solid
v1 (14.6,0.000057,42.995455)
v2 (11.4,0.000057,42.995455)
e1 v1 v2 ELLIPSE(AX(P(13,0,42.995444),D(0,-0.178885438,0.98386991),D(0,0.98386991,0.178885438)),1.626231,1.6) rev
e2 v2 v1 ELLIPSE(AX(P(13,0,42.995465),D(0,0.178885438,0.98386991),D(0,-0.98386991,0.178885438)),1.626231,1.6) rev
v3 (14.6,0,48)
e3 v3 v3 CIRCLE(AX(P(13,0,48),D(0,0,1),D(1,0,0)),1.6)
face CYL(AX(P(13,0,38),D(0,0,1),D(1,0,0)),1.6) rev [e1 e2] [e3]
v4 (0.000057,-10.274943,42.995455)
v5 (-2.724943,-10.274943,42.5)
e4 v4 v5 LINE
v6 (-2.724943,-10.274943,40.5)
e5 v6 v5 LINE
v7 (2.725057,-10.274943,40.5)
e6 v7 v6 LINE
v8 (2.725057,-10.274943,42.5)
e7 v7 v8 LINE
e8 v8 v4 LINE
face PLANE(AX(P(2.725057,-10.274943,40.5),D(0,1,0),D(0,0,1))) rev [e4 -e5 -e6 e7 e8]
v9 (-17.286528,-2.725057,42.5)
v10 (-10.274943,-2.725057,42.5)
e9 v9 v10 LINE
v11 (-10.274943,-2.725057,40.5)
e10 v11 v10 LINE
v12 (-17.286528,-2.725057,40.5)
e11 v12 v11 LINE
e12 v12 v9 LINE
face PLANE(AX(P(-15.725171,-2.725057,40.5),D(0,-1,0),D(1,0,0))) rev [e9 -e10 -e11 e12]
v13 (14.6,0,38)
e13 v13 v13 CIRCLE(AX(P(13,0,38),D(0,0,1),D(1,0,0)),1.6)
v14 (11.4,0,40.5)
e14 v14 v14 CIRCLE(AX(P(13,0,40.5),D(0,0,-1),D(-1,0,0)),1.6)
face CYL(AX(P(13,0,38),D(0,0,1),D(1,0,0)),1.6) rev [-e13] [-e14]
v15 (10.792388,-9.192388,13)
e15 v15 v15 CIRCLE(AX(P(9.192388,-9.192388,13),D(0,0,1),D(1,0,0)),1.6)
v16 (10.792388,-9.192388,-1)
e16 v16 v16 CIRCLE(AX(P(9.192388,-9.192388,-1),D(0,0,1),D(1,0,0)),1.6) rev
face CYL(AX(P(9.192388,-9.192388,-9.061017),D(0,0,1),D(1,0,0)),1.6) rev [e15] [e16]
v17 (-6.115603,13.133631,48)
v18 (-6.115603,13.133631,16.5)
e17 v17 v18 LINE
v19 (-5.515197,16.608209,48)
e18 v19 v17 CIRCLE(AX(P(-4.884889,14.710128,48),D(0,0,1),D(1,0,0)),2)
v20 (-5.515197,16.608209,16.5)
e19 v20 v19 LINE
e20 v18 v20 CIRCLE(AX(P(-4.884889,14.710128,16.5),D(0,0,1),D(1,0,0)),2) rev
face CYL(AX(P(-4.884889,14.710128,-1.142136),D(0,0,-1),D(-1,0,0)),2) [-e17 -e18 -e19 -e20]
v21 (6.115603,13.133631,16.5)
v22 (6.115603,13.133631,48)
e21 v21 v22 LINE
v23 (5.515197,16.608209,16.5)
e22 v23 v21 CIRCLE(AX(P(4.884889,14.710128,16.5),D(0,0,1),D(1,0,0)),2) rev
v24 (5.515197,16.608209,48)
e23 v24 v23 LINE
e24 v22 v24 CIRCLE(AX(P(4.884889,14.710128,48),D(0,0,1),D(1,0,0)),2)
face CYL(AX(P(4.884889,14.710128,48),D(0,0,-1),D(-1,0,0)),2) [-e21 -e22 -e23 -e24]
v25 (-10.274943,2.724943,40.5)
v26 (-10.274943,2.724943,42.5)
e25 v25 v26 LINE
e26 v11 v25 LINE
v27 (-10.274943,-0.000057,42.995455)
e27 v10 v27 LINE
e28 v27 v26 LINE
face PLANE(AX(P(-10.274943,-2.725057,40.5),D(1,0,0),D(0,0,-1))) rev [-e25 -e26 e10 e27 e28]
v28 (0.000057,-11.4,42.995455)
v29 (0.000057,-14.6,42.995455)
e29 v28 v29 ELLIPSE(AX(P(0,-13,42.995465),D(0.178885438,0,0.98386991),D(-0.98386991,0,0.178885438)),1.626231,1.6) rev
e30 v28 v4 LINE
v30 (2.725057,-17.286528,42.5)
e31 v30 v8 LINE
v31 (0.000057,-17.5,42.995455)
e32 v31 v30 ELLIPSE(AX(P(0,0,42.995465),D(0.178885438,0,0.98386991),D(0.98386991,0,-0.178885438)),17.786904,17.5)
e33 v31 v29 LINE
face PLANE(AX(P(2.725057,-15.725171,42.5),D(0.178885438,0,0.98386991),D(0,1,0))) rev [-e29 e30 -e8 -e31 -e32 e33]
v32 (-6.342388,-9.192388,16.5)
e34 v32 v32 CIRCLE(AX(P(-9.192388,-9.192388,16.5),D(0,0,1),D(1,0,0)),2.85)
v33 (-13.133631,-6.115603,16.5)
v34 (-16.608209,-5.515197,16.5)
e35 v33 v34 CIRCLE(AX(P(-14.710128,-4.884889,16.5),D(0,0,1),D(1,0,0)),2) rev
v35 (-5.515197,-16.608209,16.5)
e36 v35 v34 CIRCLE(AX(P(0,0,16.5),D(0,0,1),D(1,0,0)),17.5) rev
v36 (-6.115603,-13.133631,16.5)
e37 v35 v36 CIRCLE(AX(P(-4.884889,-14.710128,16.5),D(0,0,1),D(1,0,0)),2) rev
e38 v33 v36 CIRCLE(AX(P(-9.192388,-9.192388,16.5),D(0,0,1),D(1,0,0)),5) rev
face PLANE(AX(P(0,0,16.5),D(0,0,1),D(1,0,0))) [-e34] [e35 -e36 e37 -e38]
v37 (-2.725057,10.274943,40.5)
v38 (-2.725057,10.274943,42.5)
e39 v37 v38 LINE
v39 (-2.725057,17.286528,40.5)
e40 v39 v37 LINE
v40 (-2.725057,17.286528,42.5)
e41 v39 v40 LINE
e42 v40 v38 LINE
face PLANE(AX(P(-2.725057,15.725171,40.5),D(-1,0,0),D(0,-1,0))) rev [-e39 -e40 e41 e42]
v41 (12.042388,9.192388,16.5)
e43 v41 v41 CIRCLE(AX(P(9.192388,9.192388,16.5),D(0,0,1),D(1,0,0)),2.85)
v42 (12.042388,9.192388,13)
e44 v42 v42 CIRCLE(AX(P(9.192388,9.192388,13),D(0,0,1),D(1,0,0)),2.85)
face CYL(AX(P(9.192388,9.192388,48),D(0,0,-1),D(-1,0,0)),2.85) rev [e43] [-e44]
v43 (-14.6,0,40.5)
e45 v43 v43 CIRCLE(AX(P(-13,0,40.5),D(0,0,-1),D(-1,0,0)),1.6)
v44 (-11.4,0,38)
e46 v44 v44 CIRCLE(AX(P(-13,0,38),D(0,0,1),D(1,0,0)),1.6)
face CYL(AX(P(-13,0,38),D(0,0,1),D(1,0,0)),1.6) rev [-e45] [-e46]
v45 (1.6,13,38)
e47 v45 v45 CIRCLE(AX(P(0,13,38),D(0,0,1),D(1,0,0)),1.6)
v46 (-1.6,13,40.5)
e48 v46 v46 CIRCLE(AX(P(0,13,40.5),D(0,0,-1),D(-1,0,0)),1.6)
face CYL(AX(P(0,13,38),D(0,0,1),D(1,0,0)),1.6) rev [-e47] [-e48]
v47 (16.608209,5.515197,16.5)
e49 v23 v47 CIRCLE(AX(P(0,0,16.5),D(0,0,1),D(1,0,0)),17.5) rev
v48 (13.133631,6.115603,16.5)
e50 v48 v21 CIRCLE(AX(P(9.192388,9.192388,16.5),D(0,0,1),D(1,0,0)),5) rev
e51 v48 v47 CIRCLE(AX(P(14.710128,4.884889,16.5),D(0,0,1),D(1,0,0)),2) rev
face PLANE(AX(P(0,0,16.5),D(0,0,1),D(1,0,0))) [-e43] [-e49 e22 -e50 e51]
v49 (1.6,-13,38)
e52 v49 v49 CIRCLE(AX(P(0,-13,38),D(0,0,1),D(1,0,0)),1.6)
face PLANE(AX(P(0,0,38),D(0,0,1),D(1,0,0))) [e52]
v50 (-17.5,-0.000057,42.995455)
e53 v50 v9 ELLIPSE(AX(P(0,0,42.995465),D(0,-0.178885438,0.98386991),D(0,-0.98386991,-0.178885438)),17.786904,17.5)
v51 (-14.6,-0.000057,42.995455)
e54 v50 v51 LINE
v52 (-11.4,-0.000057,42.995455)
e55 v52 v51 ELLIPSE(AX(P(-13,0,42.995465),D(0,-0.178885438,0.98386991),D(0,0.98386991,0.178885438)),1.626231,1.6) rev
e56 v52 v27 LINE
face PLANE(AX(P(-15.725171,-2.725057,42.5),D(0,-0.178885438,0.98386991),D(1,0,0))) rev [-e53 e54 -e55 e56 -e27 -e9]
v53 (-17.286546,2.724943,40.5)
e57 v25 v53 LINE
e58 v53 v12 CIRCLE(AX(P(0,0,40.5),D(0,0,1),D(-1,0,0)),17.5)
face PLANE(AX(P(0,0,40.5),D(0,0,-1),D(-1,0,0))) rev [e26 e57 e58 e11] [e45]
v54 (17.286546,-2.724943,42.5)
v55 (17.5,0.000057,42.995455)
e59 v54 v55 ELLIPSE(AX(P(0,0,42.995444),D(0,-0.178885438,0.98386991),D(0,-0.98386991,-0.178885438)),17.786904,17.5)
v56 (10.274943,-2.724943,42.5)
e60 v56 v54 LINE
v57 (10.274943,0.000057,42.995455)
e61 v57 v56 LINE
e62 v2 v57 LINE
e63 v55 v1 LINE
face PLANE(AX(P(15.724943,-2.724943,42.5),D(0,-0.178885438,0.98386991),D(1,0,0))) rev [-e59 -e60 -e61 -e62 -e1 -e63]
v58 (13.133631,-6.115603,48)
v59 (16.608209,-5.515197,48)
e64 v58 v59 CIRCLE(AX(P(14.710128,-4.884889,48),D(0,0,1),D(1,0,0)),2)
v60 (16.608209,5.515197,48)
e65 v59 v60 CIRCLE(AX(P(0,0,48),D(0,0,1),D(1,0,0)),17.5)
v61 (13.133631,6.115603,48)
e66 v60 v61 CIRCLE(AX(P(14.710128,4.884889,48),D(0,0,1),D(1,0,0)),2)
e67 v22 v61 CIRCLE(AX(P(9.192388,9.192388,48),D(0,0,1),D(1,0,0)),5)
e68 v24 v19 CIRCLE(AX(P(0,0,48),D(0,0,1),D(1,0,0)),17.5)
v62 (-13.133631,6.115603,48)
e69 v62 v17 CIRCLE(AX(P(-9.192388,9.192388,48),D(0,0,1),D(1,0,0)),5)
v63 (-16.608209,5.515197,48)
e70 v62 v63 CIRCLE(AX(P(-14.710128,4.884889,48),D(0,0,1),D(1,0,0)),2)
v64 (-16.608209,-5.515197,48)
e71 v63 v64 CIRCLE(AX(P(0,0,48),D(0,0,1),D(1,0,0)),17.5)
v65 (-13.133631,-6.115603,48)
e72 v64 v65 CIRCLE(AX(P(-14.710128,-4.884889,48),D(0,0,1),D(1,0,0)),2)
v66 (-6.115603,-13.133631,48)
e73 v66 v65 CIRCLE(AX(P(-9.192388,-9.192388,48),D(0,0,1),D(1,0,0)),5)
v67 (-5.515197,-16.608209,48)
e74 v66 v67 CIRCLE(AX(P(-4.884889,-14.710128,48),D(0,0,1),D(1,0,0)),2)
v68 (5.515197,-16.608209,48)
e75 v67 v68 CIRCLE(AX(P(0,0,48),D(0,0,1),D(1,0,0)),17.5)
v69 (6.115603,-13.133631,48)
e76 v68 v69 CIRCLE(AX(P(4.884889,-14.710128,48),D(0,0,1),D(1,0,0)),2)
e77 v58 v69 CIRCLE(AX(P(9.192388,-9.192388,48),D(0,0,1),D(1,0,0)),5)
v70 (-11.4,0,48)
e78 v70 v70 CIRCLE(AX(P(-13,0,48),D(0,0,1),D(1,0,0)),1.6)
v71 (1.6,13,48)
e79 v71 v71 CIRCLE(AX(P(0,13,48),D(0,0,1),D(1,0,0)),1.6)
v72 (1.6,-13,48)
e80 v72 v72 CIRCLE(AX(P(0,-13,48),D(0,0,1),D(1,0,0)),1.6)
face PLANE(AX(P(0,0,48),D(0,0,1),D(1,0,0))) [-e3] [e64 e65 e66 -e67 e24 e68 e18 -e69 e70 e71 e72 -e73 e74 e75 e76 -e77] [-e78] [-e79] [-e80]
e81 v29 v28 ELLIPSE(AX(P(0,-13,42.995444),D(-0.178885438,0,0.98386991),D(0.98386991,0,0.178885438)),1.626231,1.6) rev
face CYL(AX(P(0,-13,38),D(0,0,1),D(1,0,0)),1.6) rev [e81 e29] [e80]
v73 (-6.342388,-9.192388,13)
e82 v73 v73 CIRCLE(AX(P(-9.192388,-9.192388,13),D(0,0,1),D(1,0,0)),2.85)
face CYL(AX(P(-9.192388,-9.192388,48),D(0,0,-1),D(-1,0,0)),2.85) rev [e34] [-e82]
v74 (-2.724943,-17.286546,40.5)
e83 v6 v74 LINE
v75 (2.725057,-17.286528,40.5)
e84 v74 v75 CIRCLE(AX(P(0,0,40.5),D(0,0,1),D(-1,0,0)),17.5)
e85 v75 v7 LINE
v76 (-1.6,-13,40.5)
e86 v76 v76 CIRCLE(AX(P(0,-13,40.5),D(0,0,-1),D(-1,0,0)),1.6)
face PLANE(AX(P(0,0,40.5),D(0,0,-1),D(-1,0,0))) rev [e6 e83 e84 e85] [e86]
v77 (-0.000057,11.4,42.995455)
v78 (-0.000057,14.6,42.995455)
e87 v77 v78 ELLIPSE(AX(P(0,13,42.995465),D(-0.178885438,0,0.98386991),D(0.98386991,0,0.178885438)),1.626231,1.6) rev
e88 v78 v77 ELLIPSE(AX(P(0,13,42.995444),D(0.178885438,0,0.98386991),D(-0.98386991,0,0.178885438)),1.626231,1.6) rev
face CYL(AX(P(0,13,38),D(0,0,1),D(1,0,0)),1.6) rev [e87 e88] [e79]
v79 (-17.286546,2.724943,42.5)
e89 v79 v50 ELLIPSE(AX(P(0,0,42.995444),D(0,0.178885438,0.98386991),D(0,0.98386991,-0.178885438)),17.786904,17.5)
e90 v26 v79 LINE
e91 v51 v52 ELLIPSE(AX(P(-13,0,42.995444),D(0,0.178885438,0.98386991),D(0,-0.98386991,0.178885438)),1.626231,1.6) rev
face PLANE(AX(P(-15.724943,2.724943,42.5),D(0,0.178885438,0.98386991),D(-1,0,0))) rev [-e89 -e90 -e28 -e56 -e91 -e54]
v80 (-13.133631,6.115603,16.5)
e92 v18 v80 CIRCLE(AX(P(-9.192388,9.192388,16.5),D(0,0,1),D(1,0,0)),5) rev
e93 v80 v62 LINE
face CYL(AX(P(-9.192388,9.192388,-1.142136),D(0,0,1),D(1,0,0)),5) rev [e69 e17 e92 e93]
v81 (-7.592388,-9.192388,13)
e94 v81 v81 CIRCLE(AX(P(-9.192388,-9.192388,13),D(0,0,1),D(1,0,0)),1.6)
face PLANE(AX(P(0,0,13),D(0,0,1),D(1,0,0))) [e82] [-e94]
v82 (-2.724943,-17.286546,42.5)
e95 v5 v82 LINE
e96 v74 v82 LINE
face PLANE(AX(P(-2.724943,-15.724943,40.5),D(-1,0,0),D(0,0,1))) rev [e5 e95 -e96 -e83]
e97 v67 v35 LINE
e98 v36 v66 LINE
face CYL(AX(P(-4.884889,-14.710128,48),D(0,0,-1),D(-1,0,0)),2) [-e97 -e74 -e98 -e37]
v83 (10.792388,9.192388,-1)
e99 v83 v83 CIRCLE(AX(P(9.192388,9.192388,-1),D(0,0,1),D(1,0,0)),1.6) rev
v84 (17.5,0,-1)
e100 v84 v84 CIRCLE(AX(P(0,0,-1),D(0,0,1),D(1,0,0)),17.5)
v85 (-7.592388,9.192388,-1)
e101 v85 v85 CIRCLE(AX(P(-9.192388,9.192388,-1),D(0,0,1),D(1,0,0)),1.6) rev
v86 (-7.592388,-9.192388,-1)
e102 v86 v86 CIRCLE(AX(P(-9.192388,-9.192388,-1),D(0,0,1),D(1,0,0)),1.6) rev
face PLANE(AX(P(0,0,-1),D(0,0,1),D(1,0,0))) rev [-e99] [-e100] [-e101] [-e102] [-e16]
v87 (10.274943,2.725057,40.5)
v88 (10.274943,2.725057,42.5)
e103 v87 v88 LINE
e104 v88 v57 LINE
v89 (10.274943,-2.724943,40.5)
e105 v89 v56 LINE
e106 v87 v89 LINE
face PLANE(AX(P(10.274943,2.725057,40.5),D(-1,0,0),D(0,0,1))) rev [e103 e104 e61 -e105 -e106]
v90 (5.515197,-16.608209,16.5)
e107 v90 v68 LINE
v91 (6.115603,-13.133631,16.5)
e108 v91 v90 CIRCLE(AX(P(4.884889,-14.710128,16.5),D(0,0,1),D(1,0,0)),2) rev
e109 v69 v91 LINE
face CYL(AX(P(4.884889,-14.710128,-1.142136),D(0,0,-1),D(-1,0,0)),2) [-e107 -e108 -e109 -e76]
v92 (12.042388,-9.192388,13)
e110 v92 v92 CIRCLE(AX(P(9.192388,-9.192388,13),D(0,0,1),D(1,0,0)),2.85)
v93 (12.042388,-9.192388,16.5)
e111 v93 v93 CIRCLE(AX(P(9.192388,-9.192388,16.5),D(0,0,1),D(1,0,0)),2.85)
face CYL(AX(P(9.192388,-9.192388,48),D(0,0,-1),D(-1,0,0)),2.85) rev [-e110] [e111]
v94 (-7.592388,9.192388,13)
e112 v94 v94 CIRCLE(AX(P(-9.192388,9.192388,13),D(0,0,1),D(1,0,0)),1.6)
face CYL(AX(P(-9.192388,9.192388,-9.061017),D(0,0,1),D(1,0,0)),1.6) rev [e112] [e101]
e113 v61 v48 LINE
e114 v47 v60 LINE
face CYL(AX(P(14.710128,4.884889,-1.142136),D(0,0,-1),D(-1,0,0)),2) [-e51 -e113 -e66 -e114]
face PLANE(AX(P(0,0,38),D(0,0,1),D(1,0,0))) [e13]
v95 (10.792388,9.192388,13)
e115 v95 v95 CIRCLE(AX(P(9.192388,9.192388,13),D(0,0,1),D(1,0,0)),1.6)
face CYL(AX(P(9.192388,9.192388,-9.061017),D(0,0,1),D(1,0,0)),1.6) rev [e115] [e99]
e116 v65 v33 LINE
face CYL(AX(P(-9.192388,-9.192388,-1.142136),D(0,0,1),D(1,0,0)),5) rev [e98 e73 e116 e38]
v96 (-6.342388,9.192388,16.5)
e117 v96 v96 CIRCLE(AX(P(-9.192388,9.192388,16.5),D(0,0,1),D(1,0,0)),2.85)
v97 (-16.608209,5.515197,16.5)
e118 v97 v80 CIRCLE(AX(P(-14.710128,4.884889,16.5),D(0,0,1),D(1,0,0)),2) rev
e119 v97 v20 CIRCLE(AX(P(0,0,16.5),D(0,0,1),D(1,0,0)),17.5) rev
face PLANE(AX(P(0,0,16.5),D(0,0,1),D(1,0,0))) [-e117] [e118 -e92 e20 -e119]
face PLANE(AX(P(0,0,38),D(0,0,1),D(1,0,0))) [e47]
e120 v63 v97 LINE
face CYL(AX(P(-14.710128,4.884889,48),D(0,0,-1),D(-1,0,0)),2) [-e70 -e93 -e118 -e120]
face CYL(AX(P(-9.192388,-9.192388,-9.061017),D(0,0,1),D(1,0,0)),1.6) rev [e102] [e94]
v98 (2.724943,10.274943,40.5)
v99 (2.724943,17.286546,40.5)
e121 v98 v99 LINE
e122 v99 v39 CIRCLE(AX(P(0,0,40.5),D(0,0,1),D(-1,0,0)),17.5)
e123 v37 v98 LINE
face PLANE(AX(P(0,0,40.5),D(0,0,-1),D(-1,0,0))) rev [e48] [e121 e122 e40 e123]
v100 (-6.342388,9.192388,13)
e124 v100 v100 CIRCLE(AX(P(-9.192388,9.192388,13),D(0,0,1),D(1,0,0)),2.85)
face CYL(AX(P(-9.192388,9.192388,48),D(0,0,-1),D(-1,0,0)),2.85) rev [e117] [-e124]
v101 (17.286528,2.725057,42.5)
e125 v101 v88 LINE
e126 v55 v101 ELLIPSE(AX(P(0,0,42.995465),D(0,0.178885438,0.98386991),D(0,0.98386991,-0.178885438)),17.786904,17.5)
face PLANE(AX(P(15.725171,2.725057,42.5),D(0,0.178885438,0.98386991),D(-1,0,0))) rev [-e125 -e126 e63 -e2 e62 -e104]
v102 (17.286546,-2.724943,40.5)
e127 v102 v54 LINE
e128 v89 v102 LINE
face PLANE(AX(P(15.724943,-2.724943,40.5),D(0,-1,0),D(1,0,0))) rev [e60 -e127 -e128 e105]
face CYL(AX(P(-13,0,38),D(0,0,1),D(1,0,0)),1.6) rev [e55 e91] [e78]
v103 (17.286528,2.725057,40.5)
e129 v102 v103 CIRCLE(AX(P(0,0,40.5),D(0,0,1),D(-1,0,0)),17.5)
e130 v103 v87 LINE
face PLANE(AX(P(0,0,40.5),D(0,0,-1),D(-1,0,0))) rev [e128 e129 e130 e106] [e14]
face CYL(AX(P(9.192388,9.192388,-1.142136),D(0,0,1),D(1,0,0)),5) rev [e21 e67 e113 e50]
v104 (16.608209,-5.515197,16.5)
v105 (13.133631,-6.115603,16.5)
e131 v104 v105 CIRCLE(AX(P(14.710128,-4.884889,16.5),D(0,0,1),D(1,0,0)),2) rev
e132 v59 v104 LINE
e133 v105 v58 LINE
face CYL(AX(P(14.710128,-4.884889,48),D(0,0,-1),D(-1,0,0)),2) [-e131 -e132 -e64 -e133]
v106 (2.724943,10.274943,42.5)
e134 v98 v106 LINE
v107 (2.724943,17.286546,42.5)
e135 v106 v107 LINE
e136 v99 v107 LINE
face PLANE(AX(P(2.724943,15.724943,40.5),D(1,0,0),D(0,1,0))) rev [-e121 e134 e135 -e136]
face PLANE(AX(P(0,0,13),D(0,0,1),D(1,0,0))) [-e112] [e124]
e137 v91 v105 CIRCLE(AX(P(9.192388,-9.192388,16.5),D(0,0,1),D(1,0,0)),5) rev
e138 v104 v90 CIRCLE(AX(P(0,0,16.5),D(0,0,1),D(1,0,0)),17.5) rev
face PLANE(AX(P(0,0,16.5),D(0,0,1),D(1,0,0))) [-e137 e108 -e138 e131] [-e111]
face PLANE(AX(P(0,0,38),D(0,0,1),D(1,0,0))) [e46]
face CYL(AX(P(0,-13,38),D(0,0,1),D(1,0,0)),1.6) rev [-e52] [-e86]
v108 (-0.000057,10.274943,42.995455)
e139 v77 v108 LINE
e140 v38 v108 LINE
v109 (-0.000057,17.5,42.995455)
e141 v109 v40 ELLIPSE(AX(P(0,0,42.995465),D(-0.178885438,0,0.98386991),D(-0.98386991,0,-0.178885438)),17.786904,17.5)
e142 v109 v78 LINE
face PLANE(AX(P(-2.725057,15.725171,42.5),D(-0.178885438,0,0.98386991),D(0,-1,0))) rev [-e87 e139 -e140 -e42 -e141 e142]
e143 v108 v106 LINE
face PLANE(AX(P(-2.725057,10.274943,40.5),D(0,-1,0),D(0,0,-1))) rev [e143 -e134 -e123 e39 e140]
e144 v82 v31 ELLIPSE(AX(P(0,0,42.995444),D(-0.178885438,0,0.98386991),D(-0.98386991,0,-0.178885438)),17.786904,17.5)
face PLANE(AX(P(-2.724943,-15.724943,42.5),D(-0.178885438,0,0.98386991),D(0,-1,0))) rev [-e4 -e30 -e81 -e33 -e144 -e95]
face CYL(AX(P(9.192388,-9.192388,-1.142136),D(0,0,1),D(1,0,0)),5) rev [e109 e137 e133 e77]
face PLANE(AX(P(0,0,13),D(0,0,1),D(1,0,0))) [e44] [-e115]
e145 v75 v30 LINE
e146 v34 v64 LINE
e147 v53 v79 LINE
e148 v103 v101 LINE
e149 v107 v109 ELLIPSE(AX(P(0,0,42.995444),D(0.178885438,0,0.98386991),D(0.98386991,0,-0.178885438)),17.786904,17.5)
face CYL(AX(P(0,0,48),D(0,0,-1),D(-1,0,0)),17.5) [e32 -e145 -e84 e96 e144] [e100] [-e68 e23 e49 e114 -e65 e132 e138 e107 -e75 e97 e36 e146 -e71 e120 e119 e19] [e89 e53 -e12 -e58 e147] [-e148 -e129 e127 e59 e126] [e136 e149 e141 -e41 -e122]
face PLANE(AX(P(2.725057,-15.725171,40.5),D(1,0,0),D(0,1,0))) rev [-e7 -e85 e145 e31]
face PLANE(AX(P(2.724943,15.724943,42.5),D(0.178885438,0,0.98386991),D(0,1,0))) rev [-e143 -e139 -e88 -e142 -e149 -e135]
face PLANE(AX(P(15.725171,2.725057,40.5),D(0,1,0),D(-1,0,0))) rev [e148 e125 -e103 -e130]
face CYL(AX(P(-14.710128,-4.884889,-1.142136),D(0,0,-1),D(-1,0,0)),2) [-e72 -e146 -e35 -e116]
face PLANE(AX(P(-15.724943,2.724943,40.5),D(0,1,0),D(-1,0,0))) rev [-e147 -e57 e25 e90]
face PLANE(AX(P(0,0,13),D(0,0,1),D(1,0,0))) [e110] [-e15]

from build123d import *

# Parameters (mm, degrees)
SKETCH1_R                = 17.5
SKETCH1_R_2              = 2.85
BOSS_EXTRUDE1_DEPTH      = 48
BOSS_EXTRUDE3_START      = -1
SKETCH1_4_R              = 17.5
SKETCH1_4_R_2            = 2.85
BOSS_EXTRUDE3_DEPTH      = 1
BOSS_EXTRUDE2_DEPTH      = 13
BOSS_EXTRUDE2_DEPTH_BACK = 1
SKETCH1_3_R              = 2.85
SKETCH1_3_R_2            = 1.6
SKETCH2_R                = 5
CUT_EXTRUDE1_DEPTH       = 31.5
FILLET1_R                = 2
CUT_EXTRUDE2_START       = -7.5
SKETCH3_R                = 1.6
CUT_EXTRUDE2_DEPTH       = 2.5
CUT_EXTRUDE3_START       = -10
SKETCH3_2_R              = 1.6
CUT_EXTRUDE3_DEPTH       = 10
CHAMFER1_SIZE            = 2.75
CHAMFER1_SIZE_2          = 0.5


with BuildPart() as part:
    # Sketch1 → Boss-Extrude1 (new body)
    with BuildSketch(Plane(origin=(0, 0, 0), x_dir=(0, 1, 0), z_dir=(0, 0, 1))):
        with Locations(Location((0, 0, 0), (0, 0, 270))):
            Circle(SKETCH1_R)
        with Locations(Location((-9.192388155, 9.192388155, 0), (0, 0, 270))):
            Circle(SKETCH1_R_2, mode=Mode.SUBTRACT)
        with Locations(Location((-9.192388155, -9.192388155, 0), (0, 0, 270))):
            Circle(SKETCH1_R_2, mode=Mode.SUBTRACT)
        with Locations(Location((9.192388155, -9.192388155, 0), (0, 0, 270))):
            Circle(SKETCH1_R_2, mode=Mode.SUBTRACT)
        with Locations(Location((9.192388155, 9.192388155, 0), (0, 0, 270))):
            Circle(SKETCH1_R_2, mode=Mode.SUBTRACT)
    extrude(amount=BOSS_EXTRUDE1_DEPTH)

    # Sketch1<4> → Boss-Extrude3 (add)
    with BuildSketch(Plane(origin=(0, 0, 0), x_dir=(0, 1, 0), z_dir=(0, 0, 1)).offset(BOSS_EXTRUDE3_START)):
        with Locations(Location((0, 0, 0), (0, 0, 270))):
            Circle(SKETCH1_4_R)
        with Locations(Location((-9.192388155, 9.192388155, 0), (0, 0, 270))):
            Circle(SKETCH1_4_R_2, mode=Mode.SUBTRACT)
        with Locations(Location((-9.192388155, -9.192388155, 0), (0, 0, 270))):
            Circle(SKETCH1_4_R_2, mode=Mode.SUBTRACT)
        with Locations(Location((9.192388155, -9.192388155, 0), (0, 0, 270))):
            Circle(SKETCH1_4_R_2, mode=Mode.SUBTRACT)
        with Locations(Location((9.192388155, 9.192388155, 0), (0, 0, 270))):
            Circle(SKETCH1_4_R_2, mode=Mode.SUBTRACT)
    extrude(amount=BOSS_EXTRUDE3_DEPTH)

    # Sketch1<3> → Boss-Extrude2 (add, two sides: drawn at the far end of the back side and taken through both)
    # profile 1 of 4: a face of its own
    with BuildSketch(Plane(origin=(0, 0, 0), x_dir=(0, 1, 0), z_dir=(0, 0, 1)).offset(-BOSS_EXTRUDE2_DEPTH_BACK)):
        with Locations(Location((-9.192388155, -9.192388155, 0), (0, 0, 270))):
            Circle(SKETCH1_3_R)
        with Locations(Location((-9.192388155, -9.192388155, 0), (0, 0, 270))):
            Circle(SKETCH1_3_R_2, mode=Mode.SUBTRACT)
    # profile 2 of 4: a face of its own
    with BuildSketch(Plane(origin=(0, 0, 0), x_dir=(0, 1, 0), z_dir=(0, 0, 1)).offset(-BOSS_EXTRUDE2_DEPTH_BACK)):
        with Locations(Location((-9.192388155, 9.192388155, 0), (0, 0, 270))):
            Circle(SKETCH1_3_R)
        with Locations(Location((-9.192388155, 9.192388155, 0), (0, 0, 270))):
            Circle(SKETCH1_3_R_2, mode=Mode.SUBTRACT)
    # profile 3 of 4: a face of its own
    with BuildSketch(Plane(origin=(0, 0, 0), x_dir=(0, 1, 0), z_dir=(0, 0, 1)).offset(-BOSS_EXTRUDE2_DEPTH_BACK)):
        with Locations(Location((9.192388155, -9.192388155, 0), (0, 0, 270))):
            Circle(SKETCH1_3_R)
        with Locations(Location((9.192388155, -9.192388155, 0), (0, 0, 270))):
            Circle(SKETCH1_3_R_2, mode=Mode.SUBTRACT)
    # profile 4 of 4: a face of its own
    with BuildSketch(Plane(origin=(0, 0, 0), x_dir=(0, 1, 0), z_dir=(0, 0, 1)).offset(-BOSS_EXTRUDE2_DEPTH_BACK)):
        with Locations(Location((9.192388155, 9.192388155, 0), (0, 0, 270))):
            Circle(SKETCH1_3_R)
        with Locations(Location((9.192388155, 9.192388155, 0), (0, 0, 270))):
            Circle(SKETCH1_3_R_2, mode=Mode.SUBTRACT)
    extrude(amount=BOSS_EXTRUDE2_DEPTH + BOSS_EXTRUDE2_DEPTH_BACK)

    # Sketch2 → Cut-Extrude1 (cut)
    with BuildSketch(Plane.XY.offset(48)):
        with Locations((-9.192388155, 9.192388155)):
            Circle(SKETCH2_R)
        with Locations((9.192388155, 9.192388155)):
            Circle(SKETCH2_R)
        with Locations((9.192388155, -9.192388155)):
            Circle(SKETCH2_R)
        with Locations((-9.192388155, -9.192388155)):
            Circle(SKETCH2_R)
    extrude(amount=-CUT_EXTRUDE1_DEPTH, mode=Mode.SUBTRACT)

    # Fillet1
    fillet1_edges = [part.edges().sort_by_distance(p)[0] for p in [
        (14.028560913, -10.46181049, 32.25),
        (10.46181049, -14.028560913, 32.25),
        (10.46181049, 14.028560913, 32.25),
        (14.028560913, 10.46181049, 32.25),
        (-14.028560913, 10.46181049, 32.25),
        (-10.46181049, 14.028560913, 32.25),
        (-10.46181049, -14.028560913, 32.25),
        (-14.028560913, -10.46181049, 32.25),
    ]]
    fillet(fillet1_edges, radius=FILLET1_R)

    # Sketch3 → Cut-Extrude2 (cut)
    # profile 1 of 4: a face of its own
    with BuildSketch(Plane.XY.offset(48).offset(CUT_EXTRUDE2_START)):
        with BuildLine():
            Line((-2.725057077, 15.725171237), (-2.725057077, 17.286528394))
            ThreePointArc((-2.725057077, 17.286528394), (-5.7782e-05, 17.5), (2.724942923, 17.286546389))
            Line((2.724942923, 17.286546389), (2.724942923, 15.724942923))
            Line((2.724942923, 15.724942923), (2.724942923, 10.274942923))
            Line((2.724942923, 10.274942923), (-2.725057077, 10.274942923))
            Line((-2.725057077, 10.274942923), (-2.725057077, 15.725171237))
        make_face()
        with Locations((0, 13)):
            Circle(SKETCH3_R, mode=Mode.SUBTRACT)
    # profile 2 of 4: a face of its own
    with BuildSketch(Plane.XY.offset(48).offset(CUT_EXTRUDE2_START)):
        with BuildLine():
            Line((15.724942923, -2.724942923), (10.274942923, -2.724942923))
            Line((10.274942923, -2.724942923), (10.274942923, 2.725057077))
            Line((10.274942923, 2.725057077), (15.725171237, 2.725057077))
            Line((15.725171237, 2.725057077), (17.286528394, 2.725057077))
            ThreePointArc((17.286528394, 2.725057077), (17.5, 5.7782e-05), (17.286546389, -2.724942923))
            Line((17.286546389, -2.724942923), (15.724942923, -2.724942923))
        make_face()
        with Locations((13, 0)):
            Circle(SKETCH3_R, mode=Mode.SUBTRACT)
    # profile 3 of 4: a face of its own
    with BuildSketch(Plane.XY.offset(48).offset(CUT_EXTRUDE2_START)):
        with BuildLine():
            Line((-2.724942923, -15.724942923), (-2.724942923, -10.274942923))
            Line((-2.724942923, -10.274942923), (2.725057077, -10.274942923))
            Line((2.725057077, -10.274942923), (2.725057077, -15.725171237))
            Line((2.725057077, -15.725171237), (2.725057077, -17.286528394))
            ThreePointArc((2.725057077, -17.286528394), (5.7782e-05, -17.5), (-2.724942923, -17.286546389))
            Line((-2.724942923, -17.286546389), (-2.724942923, -15.724942923))
        make_face()
        with Locations((0, -13)):
            Circle(SKETCH3_R, mode=Mode.SUBTRACT)
    # profile 4 of 4: a face of its own
    with BuildSketch(Plane.XY.offset(48).offset(CUT_EXTRUDE2_START)):
        with BuildLine():
            Line((-15.724942923, 2.724942923), (-10.274942923, 2.724942923))
            Line((-10.274942923, 2.724942923), (-10.274942923, -2.725057077))
            Line((-10.274942923, -2.725057077), (-15.725171237, -2.725057077))
            Line((-15.725171237, -2.725057077), (-17.286528394, -2.725057077))
            ThreePointArc((-17.286528394, -2.725057077), (-17.5, -5.7782e-05), (-17.286546389, 2.724942923))
            Line((-17.286546389, 2.724942923), (-15.724942923, 2.724942923))
        make_face()
        with Locations((-13, 0)):
            Circle(SKETCH3_R, mode=Mode.SUBTRACT)
    extrude(amount=CUT_EXTRUDE2_DEPTH, mode=Mode.SUBTRACT)

    # Sketch3<2> → Cut-Extrude3 (cut)
    with BuildSketch(Plane.XY.offset(48).offset(CUT_EXTRUDE3_START)):
        with Locations((-13, 0)):
            Circle(SKETCH3_2_R)
        with Locations((0, 13)):
            Circle(SKETCH3_2_R)
        with Locations((13, 0)):
            Circle(SKETCH3_2_R)
        with Locations((0, -13)):
            Circle(SKETCH3_2_R)
    extrude(amount=CUT_EXTRUDE3_DEPTH, mode=Mode.SUBTRACT)

    # Chamfer1
    # the kernel refuses this chamfer: 2.75, 0.5 mm, written as the material it adds along each edge
    with BuildSketch(Plane(origin=(-3.129209364, -2.725057077, 43), x_dir=(0, 0.9999763028084744, 0.006884317068104265), z_dir=(-1, 0, 0))) as chamfer1_piece_1_section:
        Polygon((CHAMFER1_SIZE * 0.999976302808, CHAMFER1_SIZE * 0.0068843170681), (-CHAMFER1_SIZE_2 * 0.0068843170681, CHAMFER1_SIZE_2 * 0.999976302808), (0, 0), align=None)
    chamfer1_piece_1 = extrude(amount=21.30305259, mode=Mode.PRIVATE)
    chamfer1_piece_1 = chamfer1_piece_1 & Plane(origin=(0, 0, 42.863927103), x_dir=(1, 0, 0), z_dir=(0, 0, -1)) * Cylinder(17.5, 54, mode=Mode.PRIVATE)
    chamfer1_piece_1 = chamfer1_piece_1 - Plane(origin=(-13, 0, 42.863927103), x_dir=(1, 0, 0), z_dir=(0, 0, -1)) * Cylinder(1.6, 54, mode=Mode.PRIVATE)
    add(chamfer1_piece_1)
    with BuildSketch(Plane(origin=(-24.432279948, 2.724942923, 43), x_dir=(0, 0.20388124945923355, -0.9789956262001082), z_dir=(1, 0, 0))) as chamfer1_piece_2_section:
        Polygon((CHAMFER1_SIZE_2 * 0.9789956262, -CHAMFER1_SIZE_2 * 0.203881249459), (-CHAMFER1_SIZE * 0.203881249459, -CHAMFER1_SIZE * 0.9789956262), (0, 0), align=None)
    chamfer1_piece_2 = extrude(amount=21.303070585, mode=Mode.PRIVATE)
    chamfer1_piece_2 = chamfer1_piece_2 & Plane(origin=(0, 0, 42.851795499), x_dir=(1, 0, 0), z_dir=(0, 0, -1)) * Cylinder(17.5, 54, mode=Mode.PRIVATE)
    chamfer1_piece_2 = chamfer1_piece_2 - Plane(origin=(-13, 0, 42.851795499), x_dir=(1, 0, 0), z_dir=(0, 0, -1)) * Cylinder(1.6, 54, mode=Mode.PRIVATE)
    add(chamfer1_piece_2)
    with BuildSketch(Plane(origin=(-2.725057077, 3.129209364, 43), x_dir=(0.9999763028084744, 0, 0.006884317068104265), z_dir=(0, 1, 0))) as chamfer1_piece_3_section:
        Polygon((CHAMFER1_SIZE * 0.999976302808, CHAMFER1_SIZE * 0.0068843170681), (-CHAMFER1_SIZE_2 * 0.0068843170681, CHAMFER1_SIZE_2 * 0.999976302808), (0, 0), align=None)
    chamfer1_piece_3 = extrude(amount=21.30305259, mode=Mode.PRIVATE)
    chamfer1_piece_3 = chamfer1_piece_3 & Plane(origin=(0, 0, 42.863927103), x_dir=(1, 0, 0), z_dir=(0, 0, -1)) * Cylinder(17.5, 54, mode=Mode.PRIVATE)
    chamfer1_piece_3 = chamfer1_piece_3 - Plane(origin=(0, 13, 42.863927103), x_dir=(1, 0, 0), z_dir=(0, 0, -1)) * Cylinder(1.6, 54, mode=Mode.PRIVATE)
    add(chamfer1_piece_3)
    with BuildSketch(Plane(origin=(2.724942923, 24.432279948, 43), x_dir=(0.20388124945923355, 0, -0.9789956262001082), z_dir=(0, -1, 0))) as chamfer1_piece_4_section:
        Polygon((CHAMFER1_SIZE_2 * 0.9789956262, -CHAMFER1_SIZE_2 * 0.203881249459), (-CHAMFER1_SIZE * 0.203881249459, -CHAMFER1_SIZE * 0.9789956262), (0, 0), align=None)
    chamfer1_piece_4 = extrude(amount=21.303070585, mode=Mode.PRIVATE)
    chamfer1_piece_4 = chamfer1_piece_4 & Plane(origin=(0, 0, 42.851795495), x_dir=(1, 0, 0), z_dir=(0, 0, -1)) * Cylinder(17.5, 54, mode=Mode.PRIVATE)
    chamfer1_piece_4 = chamfer1_piece_4 - Plane(origin=(0, 13, 42.851795495), x_dir=(1, 0, 0), z_dir=(0, 0, -1)) * Cylinder(1.6, 54, mode=Mode.PRIVATE)
    add(chamfer1_piece_4)
    with BuildSketch(Plane(origin=(3.129209364, 2.725057077, 43), x_dir=(0, -0.9999763028084744, 0.006884317068104265), z_dir=(1, 0, 0))) as chamfer1_piece_5_section:
        Polygon((CHAMFER1_SIZE * 0.999976302808, CHAMFER1_SIZE * 0.0068843170681), (-CHAMFER1_SIZE_2 * 0.0068843170681, CHAMFER1_SIZE_2 * 0.999976302808), (0, 0), align=None)
    chamfer1_piece_5 = extrude(amount=21.30305259, mode=Mode.PRIVATE)
    chamfer1_piece_5 = chamfer1_piece_5 & Plane(origin=(0, 0, 42.863927103), x_dir=(1, 0, 0), z_dir=(0, 0, -1)) * Cylinder(17.5, 54, mode=Mode.PRIVATE)
    chamfer1_piece_5 = chamfer1_piece_5 - Plane(origin=(13, 0, 42.863927103), x_dir=(1, 0, 0), z_dir=(0, 0, -1)) * Cylinder(1.6, 54, mode=Mode.PRIVATE)
    add(chamfer1_piece_5)
    with BuildSketch(Plane(origin=(24.432279948, -2.724942923, 43), x_dir=(0, 0.9999763028084744, 0.006884317068104265), z_dir=(-1, 0, 0))) as chamfer1_piece_6_section:
        Polygon((CHAMFER1_SIZE * 0.999976302808, CHAMFER1_SIZE * 0.0068843170681), (-CHAMFER1_SIZE_2 * 0.0068843170681, CHAMFER1_SIZE_2 * 0.999976302808), (0, 0), align=None)
    chamfer1_piece_6 = extrude(amount=21.303070585, mode=Mode.PRIVATE)
    chamfer1_piece_6 = chamfer1_piece_6 & Plane(origin=(0, 0, 42.851795381), x_dir=(1, 0, 0), z_dir=(0, 0, -1)) * Cylinder(17.5, 54, mode=Mode.PRIVATE)
    chamfer1_piece_6 = chamfer1_piece_6 - Plane(origin=(13, 0, 42.851795381), x_dir=(1, 0, 0), z_dir=(0, 0, -1)) * Cylinder(1.6, 54, mode=Mode.PRIVATE)
    add(chamfer1_piece_6)
    with BuildSketch(Plane(origin=(2.725057077, -3.129209364, 43), x_dir=(-0.9999763028084744, 0, 0.006884317068104265), z_dir=(0, -1, 0))) as chamfer1_piece_7_section:
        Polygon((CHAMFER1_SIZE * 0.999976302808, CHAMFER1_SIZE * 0.0068843170681), (-CHAMFER1_SIZE_2 * 0.0068843170681, CHAMFER1_SIZE_2 * 0.999976302808), (0, 0), align=None)
    chamfer1_piece_7 = extrude(amount=21.30305259, mode=Mode.PRIVATE)
    chamfer1_piece_7 = chamfer1_piece_7 & Plane(origin=(0, 0, 42.863927103), x_dir=(1, 0, 0), z_dir=(0, 0, -1)) * Cylinder(17.5, 54, mode=Mode.PRIVATE)
    chamfer1_piece_7 = chamfer1_piece_7 - Plane(origin=(0, -13, 42.863927103), x_dir=(1, 0, 0), z_dir=(0, 0, -1)) * Cylinder(1.6, 54, mode=Mode.PRIVATE)
    add(chamfer1_piece_7)
    with BuildSketch(Plane(origin=(-2.724942923, -24.432279948, 43), x_dir=(-0.20388124945923355, 0, -0.9789956262001082), z_dir=(0, 1, 0))) as chamfer1_piece_8_section:
        Polygon((CHAMFER1_SIZE_2 * 0.9789956262, -CHAMFER1_SIZE_2 * 0.203881249459), (-CHAMFER1_SIZE * 0.203881249459, -CHAMFER1_SIZE * 0.9789956262), (0, 0), align=None)
    chamfer1_piece_8 = extrude(amount=21.303070585, mode=Mode.PRIVATE)
    chamfer1_piece_8 = chamfer1_piece_8 & Plane(origin=(0, 0, 42.851795444), x_dir=(1, 0, 0), z_dir=(0, 0, -1)) * Cylinder(17.5, 54, mode=Mode.PRIVATE)
    chamfer1_piece_8 = chamfer1_piece_8 - Plane(origin=(0, -13, 42.851795444), x_dir=(1, 0, 0), z_dir=(0, 0, -1)) * Cylinder(1.6, 54, mode=Mode.PRIVATE)
    add(chamfer1_piece_8)


solid = part.part
